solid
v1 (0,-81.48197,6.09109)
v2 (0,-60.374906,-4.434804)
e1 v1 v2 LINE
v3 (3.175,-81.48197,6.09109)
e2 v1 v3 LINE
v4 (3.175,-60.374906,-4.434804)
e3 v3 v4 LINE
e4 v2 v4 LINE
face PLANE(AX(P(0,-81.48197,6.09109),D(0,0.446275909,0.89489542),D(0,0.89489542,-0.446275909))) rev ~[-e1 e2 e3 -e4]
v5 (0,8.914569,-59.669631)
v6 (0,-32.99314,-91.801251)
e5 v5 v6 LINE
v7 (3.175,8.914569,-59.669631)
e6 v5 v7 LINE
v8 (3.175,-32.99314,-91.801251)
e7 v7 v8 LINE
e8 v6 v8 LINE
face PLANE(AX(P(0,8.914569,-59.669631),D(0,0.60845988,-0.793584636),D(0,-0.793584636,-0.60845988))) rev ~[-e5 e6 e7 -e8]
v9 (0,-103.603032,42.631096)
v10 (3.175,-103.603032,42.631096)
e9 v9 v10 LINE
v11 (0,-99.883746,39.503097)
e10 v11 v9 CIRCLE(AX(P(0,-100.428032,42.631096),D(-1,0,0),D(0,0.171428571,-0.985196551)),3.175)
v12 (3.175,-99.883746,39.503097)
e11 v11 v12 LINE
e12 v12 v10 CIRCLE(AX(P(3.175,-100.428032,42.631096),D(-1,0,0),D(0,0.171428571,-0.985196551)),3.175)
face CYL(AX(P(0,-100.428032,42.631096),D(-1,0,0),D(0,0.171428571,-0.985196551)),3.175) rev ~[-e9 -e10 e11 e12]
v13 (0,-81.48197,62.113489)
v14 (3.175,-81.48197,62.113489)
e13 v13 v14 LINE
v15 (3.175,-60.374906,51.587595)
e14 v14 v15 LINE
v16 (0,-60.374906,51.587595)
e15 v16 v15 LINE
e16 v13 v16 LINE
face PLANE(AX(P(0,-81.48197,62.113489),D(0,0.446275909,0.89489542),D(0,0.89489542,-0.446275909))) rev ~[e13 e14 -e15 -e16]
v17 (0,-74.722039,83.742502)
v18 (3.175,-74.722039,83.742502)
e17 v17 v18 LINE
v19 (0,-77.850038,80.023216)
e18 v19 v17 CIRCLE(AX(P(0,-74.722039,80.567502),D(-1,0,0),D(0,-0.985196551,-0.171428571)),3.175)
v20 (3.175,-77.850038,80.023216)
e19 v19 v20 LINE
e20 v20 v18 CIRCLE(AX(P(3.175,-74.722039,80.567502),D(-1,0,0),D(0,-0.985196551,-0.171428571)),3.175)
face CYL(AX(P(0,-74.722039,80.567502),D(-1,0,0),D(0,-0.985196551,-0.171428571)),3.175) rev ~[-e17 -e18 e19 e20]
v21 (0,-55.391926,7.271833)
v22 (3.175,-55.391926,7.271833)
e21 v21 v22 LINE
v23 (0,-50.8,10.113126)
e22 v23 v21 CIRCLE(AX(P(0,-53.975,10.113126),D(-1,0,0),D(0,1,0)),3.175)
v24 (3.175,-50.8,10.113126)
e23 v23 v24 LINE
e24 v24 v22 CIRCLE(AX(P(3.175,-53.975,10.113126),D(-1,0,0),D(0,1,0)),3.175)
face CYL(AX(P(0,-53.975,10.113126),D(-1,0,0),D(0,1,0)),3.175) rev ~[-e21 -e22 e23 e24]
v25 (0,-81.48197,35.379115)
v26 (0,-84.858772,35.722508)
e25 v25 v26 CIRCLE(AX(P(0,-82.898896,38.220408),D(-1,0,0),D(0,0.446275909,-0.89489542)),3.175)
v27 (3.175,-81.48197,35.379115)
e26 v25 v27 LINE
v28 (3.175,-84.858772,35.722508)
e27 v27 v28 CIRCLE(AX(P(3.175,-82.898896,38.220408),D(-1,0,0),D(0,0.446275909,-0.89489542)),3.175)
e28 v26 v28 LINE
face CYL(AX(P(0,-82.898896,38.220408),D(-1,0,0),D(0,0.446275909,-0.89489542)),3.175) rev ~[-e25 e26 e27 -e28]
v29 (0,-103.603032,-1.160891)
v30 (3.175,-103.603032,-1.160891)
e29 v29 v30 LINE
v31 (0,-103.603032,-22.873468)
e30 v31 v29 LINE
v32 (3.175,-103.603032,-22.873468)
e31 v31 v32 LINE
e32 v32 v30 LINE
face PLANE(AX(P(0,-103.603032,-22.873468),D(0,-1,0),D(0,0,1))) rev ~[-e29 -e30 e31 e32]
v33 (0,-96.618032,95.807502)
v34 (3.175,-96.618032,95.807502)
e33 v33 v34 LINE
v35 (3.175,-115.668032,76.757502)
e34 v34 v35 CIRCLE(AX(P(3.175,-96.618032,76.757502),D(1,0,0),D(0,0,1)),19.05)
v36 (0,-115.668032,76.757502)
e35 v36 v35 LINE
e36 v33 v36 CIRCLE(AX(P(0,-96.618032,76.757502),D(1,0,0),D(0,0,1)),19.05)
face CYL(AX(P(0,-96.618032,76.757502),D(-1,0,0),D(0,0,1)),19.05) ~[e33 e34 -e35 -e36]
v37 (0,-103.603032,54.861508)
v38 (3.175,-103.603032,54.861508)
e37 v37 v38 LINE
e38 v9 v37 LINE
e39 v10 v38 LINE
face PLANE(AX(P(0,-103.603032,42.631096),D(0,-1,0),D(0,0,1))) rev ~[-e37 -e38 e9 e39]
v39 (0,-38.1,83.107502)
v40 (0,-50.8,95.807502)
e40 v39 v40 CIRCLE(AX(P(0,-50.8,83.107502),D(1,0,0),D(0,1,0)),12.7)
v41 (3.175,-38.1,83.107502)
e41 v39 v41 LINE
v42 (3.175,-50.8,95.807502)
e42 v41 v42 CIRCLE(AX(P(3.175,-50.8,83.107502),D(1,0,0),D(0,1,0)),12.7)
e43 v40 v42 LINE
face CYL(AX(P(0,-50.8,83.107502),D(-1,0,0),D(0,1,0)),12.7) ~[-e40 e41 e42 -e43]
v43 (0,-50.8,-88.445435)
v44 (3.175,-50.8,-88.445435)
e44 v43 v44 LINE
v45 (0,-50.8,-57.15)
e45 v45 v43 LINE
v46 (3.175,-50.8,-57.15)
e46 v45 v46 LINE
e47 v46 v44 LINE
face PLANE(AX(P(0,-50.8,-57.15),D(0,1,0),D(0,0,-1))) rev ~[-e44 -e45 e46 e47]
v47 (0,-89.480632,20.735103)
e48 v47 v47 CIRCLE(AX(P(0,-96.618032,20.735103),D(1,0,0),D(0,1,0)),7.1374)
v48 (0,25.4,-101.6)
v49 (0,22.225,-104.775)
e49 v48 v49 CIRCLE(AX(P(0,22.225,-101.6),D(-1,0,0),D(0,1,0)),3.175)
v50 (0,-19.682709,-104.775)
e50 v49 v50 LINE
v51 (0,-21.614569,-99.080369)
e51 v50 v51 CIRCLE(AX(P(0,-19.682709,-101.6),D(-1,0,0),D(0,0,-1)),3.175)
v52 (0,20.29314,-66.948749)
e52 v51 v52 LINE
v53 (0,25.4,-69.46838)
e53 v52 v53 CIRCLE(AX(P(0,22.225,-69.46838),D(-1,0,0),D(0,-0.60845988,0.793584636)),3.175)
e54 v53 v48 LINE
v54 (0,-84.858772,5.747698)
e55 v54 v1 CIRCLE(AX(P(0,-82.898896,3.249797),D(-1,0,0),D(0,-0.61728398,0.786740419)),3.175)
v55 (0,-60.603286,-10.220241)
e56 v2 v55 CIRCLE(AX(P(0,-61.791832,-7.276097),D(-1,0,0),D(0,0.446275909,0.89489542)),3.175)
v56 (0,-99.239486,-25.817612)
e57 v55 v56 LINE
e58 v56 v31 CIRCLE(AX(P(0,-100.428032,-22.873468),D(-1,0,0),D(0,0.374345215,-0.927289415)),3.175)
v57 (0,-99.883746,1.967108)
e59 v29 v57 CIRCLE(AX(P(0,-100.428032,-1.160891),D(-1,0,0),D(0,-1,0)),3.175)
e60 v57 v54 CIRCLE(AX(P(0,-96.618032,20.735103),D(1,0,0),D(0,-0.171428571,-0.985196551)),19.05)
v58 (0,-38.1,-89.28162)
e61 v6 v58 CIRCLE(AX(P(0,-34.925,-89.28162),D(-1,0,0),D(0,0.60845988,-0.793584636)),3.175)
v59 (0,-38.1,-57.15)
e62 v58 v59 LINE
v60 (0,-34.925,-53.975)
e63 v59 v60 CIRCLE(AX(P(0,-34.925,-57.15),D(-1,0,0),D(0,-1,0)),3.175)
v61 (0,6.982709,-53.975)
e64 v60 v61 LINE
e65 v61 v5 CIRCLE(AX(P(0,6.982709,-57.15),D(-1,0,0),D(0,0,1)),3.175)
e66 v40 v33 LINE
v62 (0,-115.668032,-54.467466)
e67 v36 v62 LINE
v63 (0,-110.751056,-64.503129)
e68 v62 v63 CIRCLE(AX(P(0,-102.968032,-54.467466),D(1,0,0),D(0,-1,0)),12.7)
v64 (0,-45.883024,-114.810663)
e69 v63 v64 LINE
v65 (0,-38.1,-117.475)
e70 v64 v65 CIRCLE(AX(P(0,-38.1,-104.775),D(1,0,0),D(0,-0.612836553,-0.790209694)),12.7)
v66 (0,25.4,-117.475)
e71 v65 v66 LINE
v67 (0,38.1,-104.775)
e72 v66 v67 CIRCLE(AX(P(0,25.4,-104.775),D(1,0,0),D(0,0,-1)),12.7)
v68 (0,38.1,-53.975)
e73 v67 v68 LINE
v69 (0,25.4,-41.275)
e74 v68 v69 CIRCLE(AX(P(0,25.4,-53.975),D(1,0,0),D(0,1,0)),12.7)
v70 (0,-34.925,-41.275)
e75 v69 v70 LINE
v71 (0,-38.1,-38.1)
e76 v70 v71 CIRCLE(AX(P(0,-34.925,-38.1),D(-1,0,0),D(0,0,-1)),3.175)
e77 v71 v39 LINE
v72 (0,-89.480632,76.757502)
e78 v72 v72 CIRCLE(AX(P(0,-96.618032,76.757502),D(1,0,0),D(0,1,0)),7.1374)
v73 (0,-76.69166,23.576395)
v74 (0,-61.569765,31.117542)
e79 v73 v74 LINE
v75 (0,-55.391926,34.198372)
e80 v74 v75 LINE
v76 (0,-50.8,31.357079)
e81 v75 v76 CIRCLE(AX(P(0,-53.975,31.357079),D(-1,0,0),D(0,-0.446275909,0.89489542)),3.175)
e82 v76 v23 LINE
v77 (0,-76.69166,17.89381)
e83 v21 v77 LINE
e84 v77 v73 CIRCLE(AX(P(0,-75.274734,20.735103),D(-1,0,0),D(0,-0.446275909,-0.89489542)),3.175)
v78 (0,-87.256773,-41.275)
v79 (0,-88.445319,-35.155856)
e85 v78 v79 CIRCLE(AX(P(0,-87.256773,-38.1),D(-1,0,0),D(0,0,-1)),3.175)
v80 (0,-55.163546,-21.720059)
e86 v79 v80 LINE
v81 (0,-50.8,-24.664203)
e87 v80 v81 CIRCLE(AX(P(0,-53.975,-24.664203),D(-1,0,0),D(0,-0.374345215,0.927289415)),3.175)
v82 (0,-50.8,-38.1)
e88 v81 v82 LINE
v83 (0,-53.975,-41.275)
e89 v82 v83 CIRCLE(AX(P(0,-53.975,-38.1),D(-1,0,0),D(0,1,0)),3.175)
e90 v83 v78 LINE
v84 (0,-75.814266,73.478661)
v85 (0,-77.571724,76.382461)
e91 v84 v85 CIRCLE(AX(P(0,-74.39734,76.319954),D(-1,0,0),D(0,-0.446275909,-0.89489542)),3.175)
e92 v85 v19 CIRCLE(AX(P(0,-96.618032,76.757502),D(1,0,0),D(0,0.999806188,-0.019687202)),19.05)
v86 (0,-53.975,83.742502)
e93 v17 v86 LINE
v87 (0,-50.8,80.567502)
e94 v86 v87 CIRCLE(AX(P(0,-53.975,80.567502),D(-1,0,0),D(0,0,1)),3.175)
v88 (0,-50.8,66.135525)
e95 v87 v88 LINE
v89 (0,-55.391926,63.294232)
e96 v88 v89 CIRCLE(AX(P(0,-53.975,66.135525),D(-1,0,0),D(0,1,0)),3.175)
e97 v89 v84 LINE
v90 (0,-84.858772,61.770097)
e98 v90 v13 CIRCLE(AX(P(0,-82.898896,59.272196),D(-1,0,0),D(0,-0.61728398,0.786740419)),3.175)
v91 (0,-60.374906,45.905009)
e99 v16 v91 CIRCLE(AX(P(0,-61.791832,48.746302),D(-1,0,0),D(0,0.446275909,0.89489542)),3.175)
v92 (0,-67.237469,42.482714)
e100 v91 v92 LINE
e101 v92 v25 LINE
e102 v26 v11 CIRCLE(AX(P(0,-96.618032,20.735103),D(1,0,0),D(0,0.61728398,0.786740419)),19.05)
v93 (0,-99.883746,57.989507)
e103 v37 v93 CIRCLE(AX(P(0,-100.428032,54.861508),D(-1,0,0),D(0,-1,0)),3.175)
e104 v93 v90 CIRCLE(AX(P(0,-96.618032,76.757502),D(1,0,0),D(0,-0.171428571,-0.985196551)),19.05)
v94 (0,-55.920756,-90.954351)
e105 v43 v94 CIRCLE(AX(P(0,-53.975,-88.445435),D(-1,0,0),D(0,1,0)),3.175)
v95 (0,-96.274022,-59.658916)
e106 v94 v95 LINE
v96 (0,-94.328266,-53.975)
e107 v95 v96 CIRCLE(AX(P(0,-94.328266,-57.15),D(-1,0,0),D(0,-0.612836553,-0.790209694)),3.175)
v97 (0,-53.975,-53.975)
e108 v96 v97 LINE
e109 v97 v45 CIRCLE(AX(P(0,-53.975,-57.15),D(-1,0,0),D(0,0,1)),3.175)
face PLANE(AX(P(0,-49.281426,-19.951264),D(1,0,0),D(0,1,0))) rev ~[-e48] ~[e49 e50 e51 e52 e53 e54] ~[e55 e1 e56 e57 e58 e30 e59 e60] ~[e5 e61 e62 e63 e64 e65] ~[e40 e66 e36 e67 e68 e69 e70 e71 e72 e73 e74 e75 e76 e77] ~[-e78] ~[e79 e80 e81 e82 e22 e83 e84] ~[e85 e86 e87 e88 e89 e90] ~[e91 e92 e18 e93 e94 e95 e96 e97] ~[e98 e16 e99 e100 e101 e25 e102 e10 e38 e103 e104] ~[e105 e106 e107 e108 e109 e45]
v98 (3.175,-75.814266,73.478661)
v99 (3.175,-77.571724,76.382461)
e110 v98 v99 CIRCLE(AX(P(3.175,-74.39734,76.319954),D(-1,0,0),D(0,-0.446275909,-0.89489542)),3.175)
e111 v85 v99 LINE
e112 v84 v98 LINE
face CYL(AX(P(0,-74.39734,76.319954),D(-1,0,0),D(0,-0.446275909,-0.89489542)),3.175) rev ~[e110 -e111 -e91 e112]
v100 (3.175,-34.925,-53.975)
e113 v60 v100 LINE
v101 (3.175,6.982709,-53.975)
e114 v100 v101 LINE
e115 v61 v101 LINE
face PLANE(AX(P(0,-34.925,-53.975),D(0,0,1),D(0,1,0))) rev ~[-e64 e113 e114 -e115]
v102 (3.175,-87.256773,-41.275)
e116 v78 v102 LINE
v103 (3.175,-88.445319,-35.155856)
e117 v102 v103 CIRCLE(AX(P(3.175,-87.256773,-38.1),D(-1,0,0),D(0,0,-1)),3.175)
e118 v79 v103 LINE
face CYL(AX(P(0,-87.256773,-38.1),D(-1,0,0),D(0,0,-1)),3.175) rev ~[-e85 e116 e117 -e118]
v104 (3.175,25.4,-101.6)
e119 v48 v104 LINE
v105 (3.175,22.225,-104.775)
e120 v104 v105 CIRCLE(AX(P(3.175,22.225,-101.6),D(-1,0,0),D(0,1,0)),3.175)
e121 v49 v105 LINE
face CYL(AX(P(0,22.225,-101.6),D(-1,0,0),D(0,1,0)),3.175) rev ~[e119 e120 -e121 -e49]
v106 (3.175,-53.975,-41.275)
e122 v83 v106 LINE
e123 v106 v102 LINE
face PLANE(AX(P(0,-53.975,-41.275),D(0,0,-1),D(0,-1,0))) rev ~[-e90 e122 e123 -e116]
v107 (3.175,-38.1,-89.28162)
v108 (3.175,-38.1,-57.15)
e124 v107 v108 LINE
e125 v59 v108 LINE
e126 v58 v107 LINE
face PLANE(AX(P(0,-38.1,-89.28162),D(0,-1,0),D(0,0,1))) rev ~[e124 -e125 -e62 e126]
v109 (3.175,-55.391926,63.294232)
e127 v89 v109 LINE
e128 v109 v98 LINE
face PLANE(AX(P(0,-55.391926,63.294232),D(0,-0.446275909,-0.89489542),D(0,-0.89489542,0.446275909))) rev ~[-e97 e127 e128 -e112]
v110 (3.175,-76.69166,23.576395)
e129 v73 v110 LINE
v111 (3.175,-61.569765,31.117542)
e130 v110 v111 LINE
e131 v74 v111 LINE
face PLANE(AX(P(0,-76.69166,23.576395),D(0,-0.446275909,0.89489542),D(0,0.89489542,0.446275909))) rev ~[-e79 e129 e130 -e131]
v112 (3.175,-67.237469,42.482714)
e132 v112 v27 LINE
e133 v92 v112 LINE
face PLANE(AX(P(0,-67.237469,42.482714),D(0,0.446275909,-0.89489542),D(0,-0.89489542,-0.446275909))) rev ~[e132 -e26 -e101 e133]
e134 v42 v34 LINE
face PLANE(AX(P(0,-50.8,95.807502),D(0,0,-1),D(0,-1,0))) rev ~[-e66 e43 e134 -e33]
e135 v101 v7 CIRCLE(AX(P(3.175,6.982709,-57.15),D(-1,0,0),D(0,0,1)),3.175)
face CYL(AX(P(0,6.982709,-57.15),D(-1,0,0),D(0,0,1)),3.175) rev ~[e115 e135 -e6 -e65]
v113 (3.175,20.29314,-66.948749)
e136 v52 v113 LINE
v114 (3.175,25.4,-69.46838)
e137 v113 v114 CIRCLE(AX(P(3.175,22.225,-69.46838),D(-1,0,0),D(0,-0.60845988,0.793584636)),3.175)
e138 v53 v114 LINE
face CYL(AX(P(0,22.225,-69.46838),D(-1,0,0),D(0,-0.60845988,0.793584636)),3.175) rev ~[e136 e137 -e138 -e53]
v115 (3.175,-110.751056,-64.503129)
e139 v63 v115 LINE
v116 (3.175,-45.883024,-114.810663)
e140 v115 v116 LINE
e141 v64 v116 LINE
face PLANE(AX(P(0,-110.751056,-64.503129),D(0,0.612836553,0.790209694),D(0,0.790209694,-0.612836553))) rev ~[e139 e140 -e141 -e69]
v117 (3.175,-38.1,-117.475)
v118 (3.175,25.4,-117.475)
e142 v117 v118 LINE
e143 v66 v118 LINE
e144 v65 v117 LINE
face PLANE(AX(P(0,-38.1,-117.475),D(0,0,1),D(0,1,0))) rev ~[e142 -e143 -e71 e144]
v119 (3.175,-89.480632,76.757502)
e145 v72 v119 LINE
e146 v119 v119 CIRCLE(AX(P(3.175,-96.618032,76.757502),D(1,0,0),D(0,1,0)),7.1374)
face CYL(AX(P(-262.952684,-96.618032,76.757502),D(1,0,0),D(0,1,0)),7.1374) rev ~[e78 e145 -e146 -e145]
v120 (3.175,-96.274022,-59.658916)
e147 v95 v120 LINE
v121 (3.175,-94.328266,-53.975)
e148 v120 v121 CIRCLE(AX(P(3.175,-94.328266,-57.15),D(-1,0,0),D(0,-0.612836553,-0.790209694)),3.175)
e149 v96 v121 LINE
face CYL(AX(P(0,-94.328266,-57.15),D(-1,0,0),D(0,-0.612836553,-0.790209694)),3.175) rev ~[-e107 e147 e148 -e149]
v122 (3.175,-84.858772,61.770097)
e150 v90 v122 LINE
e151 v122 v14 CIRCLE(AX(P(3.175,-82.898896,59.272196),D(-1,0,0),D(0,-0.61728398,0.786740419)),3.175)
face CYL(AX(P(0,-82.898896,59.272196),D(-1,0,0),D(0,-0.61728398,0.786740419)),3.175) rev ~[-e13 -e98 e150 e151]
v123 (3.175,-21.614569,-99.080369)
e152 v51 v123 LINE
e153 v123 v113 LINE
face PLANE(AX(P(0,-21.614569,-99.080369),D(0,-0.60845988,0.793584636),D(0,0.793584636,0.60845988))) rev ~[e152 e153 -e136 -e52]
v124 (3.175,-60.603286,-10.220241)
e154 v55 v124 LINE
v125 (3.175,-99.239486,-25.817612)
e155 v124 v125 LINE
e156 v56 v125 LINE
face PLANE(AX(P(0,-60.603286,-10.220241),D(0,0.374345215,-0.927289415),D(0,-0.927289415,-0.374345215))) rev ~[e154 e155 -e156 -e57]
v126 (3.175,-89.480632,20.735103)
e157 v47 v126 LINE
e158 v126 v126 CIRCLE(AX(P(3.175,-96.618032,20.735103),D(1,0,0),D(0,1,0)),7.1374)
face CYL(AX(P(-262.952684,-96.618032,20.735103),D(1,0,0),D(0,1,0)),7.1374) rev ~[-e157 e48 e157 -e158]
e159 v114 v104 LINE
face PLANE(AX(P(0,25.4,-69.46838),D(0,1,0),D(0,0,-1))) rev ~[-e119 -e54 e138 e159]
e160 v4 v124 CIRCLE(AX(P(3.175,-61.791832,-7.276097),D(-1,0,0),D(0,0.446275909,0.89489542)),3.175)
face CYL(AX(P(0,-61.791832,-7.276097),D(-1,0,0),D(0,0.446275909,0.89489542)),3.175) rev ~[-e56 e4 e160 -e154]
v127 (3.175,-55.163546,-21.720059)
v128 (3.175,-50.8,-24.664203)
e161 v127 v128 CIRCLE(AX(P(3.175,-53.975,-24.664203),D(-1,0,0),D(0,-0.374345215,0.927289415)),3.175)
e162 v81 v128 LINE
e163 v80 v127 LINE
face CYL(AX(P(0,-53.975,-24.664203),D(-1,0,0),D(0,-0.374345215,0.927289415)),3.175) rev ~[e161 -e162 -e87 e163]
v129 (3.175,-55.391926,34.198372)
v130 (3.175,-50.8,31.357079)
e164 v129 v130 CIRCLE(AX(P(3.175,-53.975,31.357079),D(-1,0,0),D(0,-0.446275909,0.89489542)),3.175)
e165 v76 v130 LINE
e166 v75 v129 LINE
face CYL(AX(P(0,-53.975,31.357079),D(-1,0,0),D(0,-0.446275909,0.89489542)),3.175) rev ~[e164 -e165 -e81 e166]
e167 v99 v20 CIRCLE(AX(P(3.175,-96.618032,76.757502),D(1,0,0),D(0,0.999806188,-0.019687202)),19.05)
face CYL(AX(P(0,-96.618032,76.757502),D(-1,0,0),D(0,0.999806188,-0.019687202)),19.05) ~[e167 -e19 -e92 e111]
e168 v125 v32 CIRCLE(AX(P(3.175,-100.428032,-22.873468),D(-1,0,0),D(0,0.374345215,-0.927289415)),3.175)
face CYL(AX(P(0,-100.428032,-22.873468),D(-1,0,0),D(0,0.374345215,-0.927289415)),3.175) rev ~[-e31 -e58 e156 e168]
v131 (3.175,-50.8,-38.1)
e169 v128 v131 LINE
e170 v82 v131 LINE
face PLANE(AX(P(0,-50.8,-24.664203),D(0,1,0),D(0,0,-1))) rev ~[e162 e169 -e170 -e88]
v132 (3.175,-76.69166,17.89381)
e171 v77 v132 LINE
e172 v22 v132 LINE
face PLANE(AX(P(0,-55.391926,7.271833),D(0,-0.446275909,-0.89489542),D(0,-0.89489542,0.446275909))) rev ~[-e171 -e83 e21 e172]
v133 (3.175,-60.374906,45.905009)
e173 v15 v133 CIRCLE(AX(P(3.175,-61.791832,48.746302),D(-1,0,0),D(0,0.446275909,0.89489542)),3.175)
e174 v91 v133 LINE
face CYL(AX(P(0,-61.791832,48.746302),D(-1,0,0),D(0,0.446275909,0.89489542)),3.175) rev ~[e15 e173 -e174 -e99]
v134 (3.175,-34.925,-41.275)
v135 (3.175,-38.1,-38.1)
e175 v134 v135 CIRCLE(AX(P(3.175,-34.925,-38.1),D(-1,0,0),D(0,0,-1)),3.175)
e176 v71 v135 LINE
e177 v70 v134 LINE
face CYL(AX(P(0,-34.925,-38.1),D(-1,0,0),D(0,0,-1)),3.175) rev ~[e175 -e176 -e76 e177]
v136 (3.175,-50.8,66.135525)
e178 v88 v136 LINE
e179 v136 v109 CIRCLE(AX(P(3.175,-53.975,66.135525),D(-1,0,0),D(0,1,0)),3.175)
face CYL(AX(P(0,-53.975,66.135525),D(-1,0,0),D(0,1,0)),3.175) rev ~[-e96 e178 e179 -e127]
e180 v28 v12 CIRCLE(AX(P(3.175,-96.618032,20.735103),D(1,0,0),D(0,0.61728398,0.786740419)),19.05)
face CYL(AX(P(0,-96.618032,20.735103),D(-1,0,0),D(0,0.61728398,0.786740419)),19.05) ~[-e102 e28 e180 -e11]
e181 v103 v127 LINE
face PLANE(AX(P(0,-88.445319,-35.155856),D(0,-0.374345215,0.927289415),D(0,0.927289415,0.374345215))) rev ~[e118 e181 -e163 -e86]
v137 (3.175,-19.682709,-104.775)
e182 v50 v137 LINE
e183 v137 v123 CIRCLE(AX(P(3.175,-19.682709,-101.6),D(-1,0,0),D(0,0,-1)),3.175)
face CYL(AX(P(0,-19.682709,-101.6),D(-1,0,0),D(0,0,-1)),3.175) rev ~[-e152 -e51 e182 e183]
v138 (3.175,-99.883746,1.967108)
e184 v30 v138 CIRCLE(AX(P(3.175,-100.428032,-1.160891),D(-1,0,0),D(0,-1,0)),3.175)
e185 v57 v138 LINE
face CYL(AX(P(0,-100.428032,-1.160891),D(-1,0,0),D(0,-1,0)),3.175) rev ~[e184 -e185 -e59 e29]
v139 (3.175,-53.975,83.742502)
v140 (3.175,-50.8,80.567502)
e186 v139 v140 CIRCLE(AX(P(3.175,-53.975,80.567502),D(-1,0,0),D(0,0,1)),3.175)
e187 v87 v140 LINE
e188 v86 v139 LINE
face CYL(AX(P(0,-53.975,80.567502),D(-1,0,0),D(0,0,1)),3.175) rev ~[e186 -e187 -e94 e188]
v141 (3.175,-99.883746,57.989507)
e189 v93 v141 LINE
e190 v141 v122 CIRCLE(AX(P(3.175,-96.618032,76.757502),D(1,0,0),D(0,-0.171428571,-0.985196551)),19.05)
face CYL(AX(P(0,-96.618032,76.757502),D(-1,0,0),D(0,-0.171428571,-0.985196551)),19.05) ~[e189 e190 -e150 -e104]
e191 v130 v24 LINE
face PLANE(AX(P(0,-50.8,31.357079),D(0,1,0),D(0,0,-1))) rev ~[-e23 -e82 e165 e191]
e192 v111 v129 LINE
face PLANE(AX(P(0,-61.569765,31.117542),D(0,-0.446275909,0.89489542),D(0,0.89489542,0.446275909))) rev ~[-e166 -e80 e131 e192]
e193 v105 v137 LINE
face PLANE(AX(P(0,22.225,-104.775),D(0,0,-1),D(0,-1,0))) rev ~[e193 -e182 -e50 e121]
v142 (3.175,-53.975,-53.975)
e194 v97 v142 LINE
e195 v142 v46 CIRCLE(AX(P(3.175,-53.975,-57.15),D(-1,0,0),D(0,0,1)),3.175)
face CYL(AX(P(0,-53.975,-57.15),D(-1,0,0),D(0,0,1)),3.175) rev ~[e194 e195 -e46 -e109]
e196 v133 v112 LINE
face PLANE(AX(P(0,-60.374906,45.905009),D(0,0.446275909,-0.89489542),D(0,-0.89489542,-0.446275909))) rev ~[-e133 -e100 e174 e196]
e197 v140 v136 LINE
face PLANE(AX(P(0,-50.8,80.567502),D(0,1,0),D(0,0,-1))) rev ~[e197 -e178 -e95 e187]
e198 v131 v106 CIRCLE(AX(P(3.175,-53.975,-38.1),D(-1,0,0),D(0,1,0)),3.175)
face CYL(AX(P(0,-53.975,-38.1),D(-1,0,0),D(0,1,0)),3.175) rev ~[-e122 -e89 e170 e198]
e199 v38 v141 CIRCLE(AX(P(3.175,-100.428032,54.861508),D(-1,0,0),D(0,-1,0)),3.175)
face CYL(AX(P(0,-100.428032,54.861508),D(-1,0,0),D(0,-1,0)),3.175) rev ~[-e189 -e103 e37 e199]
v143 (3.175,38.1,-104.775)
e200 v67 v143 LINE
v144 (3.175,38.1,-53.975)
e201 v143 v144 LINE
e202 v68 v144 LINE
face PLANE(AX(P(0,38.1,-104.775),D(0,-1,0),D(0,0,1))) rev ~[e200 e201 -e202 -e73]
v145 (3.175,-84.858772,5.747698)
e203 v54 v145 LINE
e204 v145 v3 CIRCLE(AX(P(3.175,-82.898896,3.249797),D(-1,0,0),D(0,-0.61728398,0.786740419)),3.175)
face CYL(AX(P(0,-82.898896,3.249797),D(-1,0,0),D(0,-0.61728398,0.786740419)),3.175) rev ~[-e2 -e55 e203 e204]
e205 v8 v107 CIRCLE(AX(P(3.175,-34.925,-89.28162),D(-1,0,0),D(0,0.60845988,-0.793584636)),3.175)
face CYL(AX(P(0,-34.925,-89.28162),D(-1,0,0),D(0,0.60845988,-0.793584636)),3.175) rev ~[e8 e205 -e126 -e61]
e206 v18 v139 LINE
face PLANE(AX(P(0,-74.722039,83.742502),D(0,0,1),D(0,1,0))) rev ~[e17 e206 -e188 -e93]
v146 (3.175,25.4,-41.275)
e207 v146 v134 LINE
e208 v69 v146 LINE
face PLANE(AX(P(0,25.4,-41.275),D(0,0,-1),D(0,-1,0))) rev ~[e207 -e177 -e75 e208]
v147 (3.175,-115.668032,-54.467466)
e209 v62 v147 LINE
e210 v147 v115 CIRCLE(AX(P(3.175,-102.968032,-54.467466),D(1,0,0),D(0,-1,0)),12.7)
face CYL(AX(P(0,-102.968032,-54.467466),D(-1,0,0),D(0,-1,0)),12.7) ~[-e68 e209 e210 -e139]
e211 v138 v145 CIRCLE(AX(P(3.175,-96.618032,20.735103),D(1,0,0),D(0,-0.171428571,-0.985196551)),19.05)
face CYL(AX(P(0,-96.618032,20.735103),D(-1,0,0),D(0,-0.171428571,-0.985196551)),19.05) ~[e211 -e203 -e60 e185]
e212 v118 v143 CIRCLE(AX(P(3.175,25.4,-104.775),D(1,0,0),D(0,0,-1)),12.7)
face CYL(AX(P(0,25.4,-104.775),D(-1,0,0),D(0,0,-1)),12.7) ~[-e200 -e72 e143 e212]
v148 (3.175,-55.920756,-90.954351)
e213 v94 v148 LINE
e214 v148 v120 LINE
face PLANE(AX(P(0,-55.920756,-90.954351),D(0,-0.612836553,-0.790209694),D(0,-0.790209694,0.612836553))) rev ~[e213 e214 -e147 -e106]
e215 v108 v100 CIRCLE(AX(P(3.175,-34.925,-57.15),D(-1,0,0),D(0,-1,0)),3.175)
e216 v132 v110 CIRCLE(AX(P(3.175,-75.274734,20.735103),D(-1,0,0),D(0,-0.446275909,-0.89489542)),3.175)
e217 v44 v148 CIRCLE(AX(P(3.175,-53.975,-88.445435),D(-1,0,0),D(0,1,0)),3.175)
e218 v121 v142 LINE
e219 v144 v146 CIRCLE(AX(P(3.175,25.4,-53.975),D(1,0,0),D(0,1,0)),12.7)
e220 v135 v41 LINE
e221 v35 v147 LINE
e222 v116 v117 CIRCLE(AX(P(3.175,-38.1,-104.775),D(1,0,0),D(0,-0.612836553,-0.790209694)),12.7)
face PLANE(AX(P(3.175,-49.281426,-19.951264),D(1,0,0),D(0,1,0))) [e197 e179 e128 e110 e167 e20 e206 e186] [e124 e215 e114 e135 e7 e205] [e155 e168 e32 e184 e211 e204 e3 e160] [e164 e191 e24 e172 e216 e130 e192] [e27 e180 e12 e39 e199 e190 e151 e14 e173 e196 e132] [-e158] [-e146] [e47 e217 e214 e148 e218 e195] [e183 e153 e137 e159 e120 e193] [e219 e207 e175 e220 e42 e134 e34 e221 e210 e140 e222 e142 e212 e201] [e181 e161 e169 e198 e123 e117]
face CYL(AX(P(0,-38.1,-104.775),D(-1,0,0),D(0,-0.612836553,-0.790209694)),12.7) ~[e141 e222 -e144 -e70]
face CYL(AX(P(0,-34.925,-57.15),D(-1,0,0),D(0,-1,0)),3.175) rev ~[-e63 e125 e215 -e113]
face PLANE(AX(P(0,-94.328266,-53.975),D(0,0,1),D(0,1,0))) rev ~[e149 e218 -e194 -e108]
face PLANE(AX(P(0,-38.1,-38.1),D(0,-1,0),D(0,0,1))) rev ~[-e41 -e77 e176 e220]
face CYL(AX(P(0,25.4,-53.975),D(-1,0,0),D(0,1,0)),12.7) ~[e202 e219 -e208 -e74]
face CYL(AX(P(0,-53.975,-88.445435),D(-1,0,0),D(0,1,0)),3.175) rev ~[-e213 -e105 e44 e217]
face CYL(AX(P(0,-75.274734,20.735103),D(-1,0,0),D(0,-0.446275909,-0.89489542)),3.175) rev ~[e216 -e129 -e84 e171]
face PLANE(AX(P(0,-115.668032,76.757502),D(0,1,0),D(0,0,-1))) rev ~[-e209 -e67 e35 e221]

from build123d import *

# Parameters (mm, degrees)
F0_R     = 6.985
F1_DEPTH = 3.175
F3_D     = 14.2748


with BuildPart() as f1:
    # F0 (on Right) → F1 (new body)
    with BuildSketch(Plane.YZ):
        with BuildLine():
            ThreePointArc((38.1, -53.975), (34.3802561211, -44.9947438789), (25.4, -41.275))
            Line((25.4, -41.275), (-34.925, -41.275))
            ThreePointArc((-34.925, -41.275), (-37.1700640303, -40.3450640303), (-38.1, -38.1))
            Line((-38.1, -38.1), (-38.1, 41.275))
            Line((-38.1, 41.275), (-38.1, 47.5751108035))
            Line((-38.1, 47.5751108035), (-38.1, 83.1075017654))
            ThreePointArc((-38.1, 83.1075017654), (-41.8197438789, 92.0877578865), (-50.8, 95.8075017654))
            Line((-50.8, 95.8075017654), (-96.6180321919, 95.8075017654))
            ThreePointArc((-96.6180321919, 95.8075017654), (-110.0884163735, 90.227885947), (-115.6680321919, 76.7575017654))
            Line((-115.6680321919, 76.7575017654), (-115.6680321919, 19.1893243394))
            Line((-115.6680321919, 19.1893243394), (-115.6680321919, -54.4674657519))
            ThreePointArc((-115.6680321919, -54.4674657519), (-114.372733143, -60.0552019855), (-110.7510564099, -64.5031288602))
            Line((-110.7510564099, -64.5031288602), (-45.883024218, -114.8106631083))
            ThreePointArc((-45.883024218, -114.8106631083), (-42.2132151977, -116.7904675622), (-38.1, -117.475))
            Line((-38.1, -117.475), (25.4, -117.475))
            ThreePointArc((25.4, -117.475), (34.3802561211, -113.7552561211), (38.1, -104.775))
            Line((38.1, -104.775), (38.1, -53.975))
        make_face()
        with BuildLine():
            ThreePointArc((-50.8, -88.4454353572), (-52.5780659416, -91.2966105949), (-55.9207560545, -90.9543511342))
            Line((-55.9207560545, -90.9543511342), (-96.2740219927, -59.6589157771))
            ThreePointArc((-96.2740219927, -59.6589157771), (-97.3321328287, -56.1216962006), (-94.3282659382, -53.975))
            Line((-94.3282659382, -53.975), (-53.975, -53.975))
            ThreePointArc((-53.975, -53.975), (-51.7299359697, -54.9049359697), (-50.8, -57.15))
            Line((-50.8, -57.15), (-50.8, -88.4454353572))
        make_face(mode=Mode.SUBTRACT)
        with BuildLine():
            Line((-88.4453191039, -35.1558561059), (-55.1635460576, -21.7200589551))
            ThreePointArc((-55.1635460576, -21.7200589551), (-52.1991915549, -22.0322588212), (-50.8, -24.6642028492))
            Line((-50.8, -24.6642028492), (-50.8, -38.1))
            ThreePointArc((-50.8, -38.1), (-51.7299359697, -40.3450640303), (-53.975, -41.275))
            Line((-53.975, -41.275), (-87.2567730463, -41.275))
            ThreePointArc((-87.2567730463, -41.275), (-90.3735247098, -38.7053792763), (-88.4453191039, -35.1558561059))
        make_face(mode=Mode.SUBTRACT)
        with BuildLine():
            ThreePointArc((-38.1, -57.15), (-37.1700640303, -54.9049359697), (-34.925, -53.975))
            Line((-34.925, -53.975), (6.9827090181, -53.975))
            ThreePointArc((6.9827090181, -53.975), (9.9894060531, -56.1300010097), (8.9145691376, -59.6696312188))
            Line((8.9145691376, -59.6696312188), (-32.9931398805, -91.8012507785))
            ThreePointArc((-32.9931398805, -91.8012507785), (-36.3298076595, -92.1289236249), (-38.1, -89.2816195597))
            Line((-38.1, -89.2816195597), (-38.1, -57.15))
        make_face(mode=Mode.SUBTRACT)
        with BuildLine():
            Line((22.225, -104.775), (-19.6827090181, -104.775))
            ThreePointArc((-19.6827090181, -104.775), (-22.6894060531, -102.6199989903), (-21.6145691376, -99.0803687812))
            Line((-21.6145691376, -99.0803687812), (20.2931398805, -66.9487492215))
            ThreePointArc((20.2931398805, -66.9487492215), (23.6298076595, -66.6210763751), (25.4, -69.4683804403))
            Line((25.4, -69.4683804403), (25.4, -101.6))
            ThreePointArc((25.4, -101.6), (24.4700640303, -103.8450640303), (22.225, -104.775))
        make_face(mode=Mode.SUBTRACT)
        with BuildLine():
            ThreePointArc((-84.8587723654, 5.7476975385), (-83.2201096499, 6.408506351), (-81.481969716, 6.0910896656))
            Line((-81.481969716, 6.0910896656), (-60.3749057725, -4.4348041313))
            ThreePointArc((-60.3749057725, -4.4348041313), (-58.6193026557, -7.4013325865), (-60.6032857265, -10.2202409842))
            Line((-60.6032857265, -10.2202409842), (-99.2394861343, -25.8176116721))
            ThreePointArc((-99.2394861343, -25.8176116721), (-102.203840637, -25.505411806), (-103.6030321919, -22.8734677781))
            Line((-103.6030321919, -22.8734677781), (-103.6030321919, -1.1608908265))
            ThreePointArc((-103.6030321919, -1.1608908265), (-102.4716219082, 1.2689993092), (-99.8837464776, 1.9671082242))
            ThreePointArc((-99.8837464776, 1.9671082242), (-91.969560093, 2.2609528282), (-84.8587723654, 5.7476975385))
        make_face(mode=Mode.SUBTRACT)
        with BuildLine():
            ThreePointArc((-96.8477962041, 27.7163225865), (-91.7608044139, 25.7548199819), (-89.6330321919, 20.7351025284))
            ThreePointArc((-89.6330321919, 20.7351025284), (-91.7608044139, 15.715385075), (-96.8477962041, 13.7538824704))
            ThreePointArc((-96.8477962041, 13.7538824704), (-103.6030321919, 20.7351025284), (-96.8477962041, 27.7163225865))
        make_face(mode=Mode.SUBTRACT)
        with BuildLine():
            Line((-50.8, 31.3570788484), (-50.8, 10.1131262084))
            ThreePointArc((-50.8, 10.1131262084), (-52.304388598, 7.4131849973), (-55.3919260116, 7.2718332496))
            Line((-55.3919260116, 7.2718332496), (-76.6916595751, 17.8938095697))
            ThreePointArc((-76.6916595751, 17.8938095696), (-78.4497335635, 20.7351025284), (-76.6916595751, 23.5763954872))
            Line((-76.6916595751, 23.5763954872), (-61.5697646385, 31.117541927))
            Line((-61.5697646385, 31.117541927), (-55.3919260116, 34.1983718072))
            ThreePointArc((-55.3919260116, 34.1983718072), (-52.304388598, 34.0570200595), (-50.8, 31.3570788484))
        make_face(mode=Mode.SUBTRACT)
        with BuildLine():
            Line((-67.2374686849, 42.4827137621), (-81.481969716, 35.3791153912))
            ThreePointArc((-81.481969716, 35.3791153912), (-83.2201096499, 35.0616987058), (-84.8587723654, 35.7225075184))
            ThreePointArc((-84.8587723654, 35.7225075184), (-91.969560093, 39.2092522286), (-99.8837464776, 39.5030968327))
            ThreePointArc((-99.8837464776, 39.5030968327), (-102.4716219082, 40.2012057477), (-103.6030321919, 42.6310958834))
            Line((-103.6030321919, 42.6310958834), (-103.6030321919, 54.8615084105))
            ThreePointArc((-103.6030321919, 54.8615084105), (-102.4716219082, 57.2913985461), (-99.8837464776, 57.9895074612))
            ThreePointArc((-99.8837464776, 57.9895074612), (-91.969560093, 58.2833520652), (-84.8587723653, 61.7700967755))
            ThreePointArc((-84.8587723654, 61.7700967755), (-83.2201096499, 62.430905588), (-81.481969716, 62.1134889026))
            Line((-81.481969716, 62.1134889026), (-60.3749057725, 51.5875951057))
            ThreePointArc((-60.3749057725, 51.5875951057), (-58.6168317841, 48.7463021469), (-60.3749057725, 45.9050091881))
            Line((-60.3749057725, 45.9050091882), (-67.2374686849, 42.4827137621))
        make_face(mode=Mode.SUBTRACT)
        with Locations((-96.6180321919, 76.7575017654)):
            Circle(F0_R, mode=Mode.SUBTRACT)
        with BuildLine():
            Line((-55.3919260116, 63.2942324866), (-75.8142656696, 73.4786607378))
            ThreePointArc((-75.8142656696, 73.4786607378), (-77.1135956749, 74.6760016746), (-77.5717243057, 76.3824605635))
            ThreePointArc((-77.5717243057, 76.3824605635), (-77.6234503942, 78.209521852), (-77.8500378876, 80.0232160511))
            ThreePointArc((-77.8500378876, 80.0232160511), (-77.1519289726, 82.6110914817), (-74.7220388369, 83.7425017654))
            Line((-74.7220388369, 83.7425017654), (-53.975, 83.7425017654))
            ThreePointArc((-53.975, 83.7425017654), (-51.7299359697, 82.8125657957), (-50.8, 80.5675017654))
            Line((-50.8, 80.5675017654), (-50.8, 66.1355254454))
            ThreePointArc((-50.8, 66.1355254454), (-52.304388598, 63.4355842343), (-55.3919260116, 63.2942324866))
        make_face(mode=Mode.SUBTRACT)
        with Locations((-96.6180321919, 76.7575017654)):
            Circle(F0_R)
    extrude(amount=F1_DEPTH)

    # F3 (through all)
    with Locations(Plane(origin=(0, 0, 0), x_dir=(0, -1, 0), z_dir=(-1, 0, 0))):
        with Locations((96.6180321919, 20.7351025284), (96.6180321919, 76.7575017654)):
            Hole(F3_D / 2)


solid = f1.part
